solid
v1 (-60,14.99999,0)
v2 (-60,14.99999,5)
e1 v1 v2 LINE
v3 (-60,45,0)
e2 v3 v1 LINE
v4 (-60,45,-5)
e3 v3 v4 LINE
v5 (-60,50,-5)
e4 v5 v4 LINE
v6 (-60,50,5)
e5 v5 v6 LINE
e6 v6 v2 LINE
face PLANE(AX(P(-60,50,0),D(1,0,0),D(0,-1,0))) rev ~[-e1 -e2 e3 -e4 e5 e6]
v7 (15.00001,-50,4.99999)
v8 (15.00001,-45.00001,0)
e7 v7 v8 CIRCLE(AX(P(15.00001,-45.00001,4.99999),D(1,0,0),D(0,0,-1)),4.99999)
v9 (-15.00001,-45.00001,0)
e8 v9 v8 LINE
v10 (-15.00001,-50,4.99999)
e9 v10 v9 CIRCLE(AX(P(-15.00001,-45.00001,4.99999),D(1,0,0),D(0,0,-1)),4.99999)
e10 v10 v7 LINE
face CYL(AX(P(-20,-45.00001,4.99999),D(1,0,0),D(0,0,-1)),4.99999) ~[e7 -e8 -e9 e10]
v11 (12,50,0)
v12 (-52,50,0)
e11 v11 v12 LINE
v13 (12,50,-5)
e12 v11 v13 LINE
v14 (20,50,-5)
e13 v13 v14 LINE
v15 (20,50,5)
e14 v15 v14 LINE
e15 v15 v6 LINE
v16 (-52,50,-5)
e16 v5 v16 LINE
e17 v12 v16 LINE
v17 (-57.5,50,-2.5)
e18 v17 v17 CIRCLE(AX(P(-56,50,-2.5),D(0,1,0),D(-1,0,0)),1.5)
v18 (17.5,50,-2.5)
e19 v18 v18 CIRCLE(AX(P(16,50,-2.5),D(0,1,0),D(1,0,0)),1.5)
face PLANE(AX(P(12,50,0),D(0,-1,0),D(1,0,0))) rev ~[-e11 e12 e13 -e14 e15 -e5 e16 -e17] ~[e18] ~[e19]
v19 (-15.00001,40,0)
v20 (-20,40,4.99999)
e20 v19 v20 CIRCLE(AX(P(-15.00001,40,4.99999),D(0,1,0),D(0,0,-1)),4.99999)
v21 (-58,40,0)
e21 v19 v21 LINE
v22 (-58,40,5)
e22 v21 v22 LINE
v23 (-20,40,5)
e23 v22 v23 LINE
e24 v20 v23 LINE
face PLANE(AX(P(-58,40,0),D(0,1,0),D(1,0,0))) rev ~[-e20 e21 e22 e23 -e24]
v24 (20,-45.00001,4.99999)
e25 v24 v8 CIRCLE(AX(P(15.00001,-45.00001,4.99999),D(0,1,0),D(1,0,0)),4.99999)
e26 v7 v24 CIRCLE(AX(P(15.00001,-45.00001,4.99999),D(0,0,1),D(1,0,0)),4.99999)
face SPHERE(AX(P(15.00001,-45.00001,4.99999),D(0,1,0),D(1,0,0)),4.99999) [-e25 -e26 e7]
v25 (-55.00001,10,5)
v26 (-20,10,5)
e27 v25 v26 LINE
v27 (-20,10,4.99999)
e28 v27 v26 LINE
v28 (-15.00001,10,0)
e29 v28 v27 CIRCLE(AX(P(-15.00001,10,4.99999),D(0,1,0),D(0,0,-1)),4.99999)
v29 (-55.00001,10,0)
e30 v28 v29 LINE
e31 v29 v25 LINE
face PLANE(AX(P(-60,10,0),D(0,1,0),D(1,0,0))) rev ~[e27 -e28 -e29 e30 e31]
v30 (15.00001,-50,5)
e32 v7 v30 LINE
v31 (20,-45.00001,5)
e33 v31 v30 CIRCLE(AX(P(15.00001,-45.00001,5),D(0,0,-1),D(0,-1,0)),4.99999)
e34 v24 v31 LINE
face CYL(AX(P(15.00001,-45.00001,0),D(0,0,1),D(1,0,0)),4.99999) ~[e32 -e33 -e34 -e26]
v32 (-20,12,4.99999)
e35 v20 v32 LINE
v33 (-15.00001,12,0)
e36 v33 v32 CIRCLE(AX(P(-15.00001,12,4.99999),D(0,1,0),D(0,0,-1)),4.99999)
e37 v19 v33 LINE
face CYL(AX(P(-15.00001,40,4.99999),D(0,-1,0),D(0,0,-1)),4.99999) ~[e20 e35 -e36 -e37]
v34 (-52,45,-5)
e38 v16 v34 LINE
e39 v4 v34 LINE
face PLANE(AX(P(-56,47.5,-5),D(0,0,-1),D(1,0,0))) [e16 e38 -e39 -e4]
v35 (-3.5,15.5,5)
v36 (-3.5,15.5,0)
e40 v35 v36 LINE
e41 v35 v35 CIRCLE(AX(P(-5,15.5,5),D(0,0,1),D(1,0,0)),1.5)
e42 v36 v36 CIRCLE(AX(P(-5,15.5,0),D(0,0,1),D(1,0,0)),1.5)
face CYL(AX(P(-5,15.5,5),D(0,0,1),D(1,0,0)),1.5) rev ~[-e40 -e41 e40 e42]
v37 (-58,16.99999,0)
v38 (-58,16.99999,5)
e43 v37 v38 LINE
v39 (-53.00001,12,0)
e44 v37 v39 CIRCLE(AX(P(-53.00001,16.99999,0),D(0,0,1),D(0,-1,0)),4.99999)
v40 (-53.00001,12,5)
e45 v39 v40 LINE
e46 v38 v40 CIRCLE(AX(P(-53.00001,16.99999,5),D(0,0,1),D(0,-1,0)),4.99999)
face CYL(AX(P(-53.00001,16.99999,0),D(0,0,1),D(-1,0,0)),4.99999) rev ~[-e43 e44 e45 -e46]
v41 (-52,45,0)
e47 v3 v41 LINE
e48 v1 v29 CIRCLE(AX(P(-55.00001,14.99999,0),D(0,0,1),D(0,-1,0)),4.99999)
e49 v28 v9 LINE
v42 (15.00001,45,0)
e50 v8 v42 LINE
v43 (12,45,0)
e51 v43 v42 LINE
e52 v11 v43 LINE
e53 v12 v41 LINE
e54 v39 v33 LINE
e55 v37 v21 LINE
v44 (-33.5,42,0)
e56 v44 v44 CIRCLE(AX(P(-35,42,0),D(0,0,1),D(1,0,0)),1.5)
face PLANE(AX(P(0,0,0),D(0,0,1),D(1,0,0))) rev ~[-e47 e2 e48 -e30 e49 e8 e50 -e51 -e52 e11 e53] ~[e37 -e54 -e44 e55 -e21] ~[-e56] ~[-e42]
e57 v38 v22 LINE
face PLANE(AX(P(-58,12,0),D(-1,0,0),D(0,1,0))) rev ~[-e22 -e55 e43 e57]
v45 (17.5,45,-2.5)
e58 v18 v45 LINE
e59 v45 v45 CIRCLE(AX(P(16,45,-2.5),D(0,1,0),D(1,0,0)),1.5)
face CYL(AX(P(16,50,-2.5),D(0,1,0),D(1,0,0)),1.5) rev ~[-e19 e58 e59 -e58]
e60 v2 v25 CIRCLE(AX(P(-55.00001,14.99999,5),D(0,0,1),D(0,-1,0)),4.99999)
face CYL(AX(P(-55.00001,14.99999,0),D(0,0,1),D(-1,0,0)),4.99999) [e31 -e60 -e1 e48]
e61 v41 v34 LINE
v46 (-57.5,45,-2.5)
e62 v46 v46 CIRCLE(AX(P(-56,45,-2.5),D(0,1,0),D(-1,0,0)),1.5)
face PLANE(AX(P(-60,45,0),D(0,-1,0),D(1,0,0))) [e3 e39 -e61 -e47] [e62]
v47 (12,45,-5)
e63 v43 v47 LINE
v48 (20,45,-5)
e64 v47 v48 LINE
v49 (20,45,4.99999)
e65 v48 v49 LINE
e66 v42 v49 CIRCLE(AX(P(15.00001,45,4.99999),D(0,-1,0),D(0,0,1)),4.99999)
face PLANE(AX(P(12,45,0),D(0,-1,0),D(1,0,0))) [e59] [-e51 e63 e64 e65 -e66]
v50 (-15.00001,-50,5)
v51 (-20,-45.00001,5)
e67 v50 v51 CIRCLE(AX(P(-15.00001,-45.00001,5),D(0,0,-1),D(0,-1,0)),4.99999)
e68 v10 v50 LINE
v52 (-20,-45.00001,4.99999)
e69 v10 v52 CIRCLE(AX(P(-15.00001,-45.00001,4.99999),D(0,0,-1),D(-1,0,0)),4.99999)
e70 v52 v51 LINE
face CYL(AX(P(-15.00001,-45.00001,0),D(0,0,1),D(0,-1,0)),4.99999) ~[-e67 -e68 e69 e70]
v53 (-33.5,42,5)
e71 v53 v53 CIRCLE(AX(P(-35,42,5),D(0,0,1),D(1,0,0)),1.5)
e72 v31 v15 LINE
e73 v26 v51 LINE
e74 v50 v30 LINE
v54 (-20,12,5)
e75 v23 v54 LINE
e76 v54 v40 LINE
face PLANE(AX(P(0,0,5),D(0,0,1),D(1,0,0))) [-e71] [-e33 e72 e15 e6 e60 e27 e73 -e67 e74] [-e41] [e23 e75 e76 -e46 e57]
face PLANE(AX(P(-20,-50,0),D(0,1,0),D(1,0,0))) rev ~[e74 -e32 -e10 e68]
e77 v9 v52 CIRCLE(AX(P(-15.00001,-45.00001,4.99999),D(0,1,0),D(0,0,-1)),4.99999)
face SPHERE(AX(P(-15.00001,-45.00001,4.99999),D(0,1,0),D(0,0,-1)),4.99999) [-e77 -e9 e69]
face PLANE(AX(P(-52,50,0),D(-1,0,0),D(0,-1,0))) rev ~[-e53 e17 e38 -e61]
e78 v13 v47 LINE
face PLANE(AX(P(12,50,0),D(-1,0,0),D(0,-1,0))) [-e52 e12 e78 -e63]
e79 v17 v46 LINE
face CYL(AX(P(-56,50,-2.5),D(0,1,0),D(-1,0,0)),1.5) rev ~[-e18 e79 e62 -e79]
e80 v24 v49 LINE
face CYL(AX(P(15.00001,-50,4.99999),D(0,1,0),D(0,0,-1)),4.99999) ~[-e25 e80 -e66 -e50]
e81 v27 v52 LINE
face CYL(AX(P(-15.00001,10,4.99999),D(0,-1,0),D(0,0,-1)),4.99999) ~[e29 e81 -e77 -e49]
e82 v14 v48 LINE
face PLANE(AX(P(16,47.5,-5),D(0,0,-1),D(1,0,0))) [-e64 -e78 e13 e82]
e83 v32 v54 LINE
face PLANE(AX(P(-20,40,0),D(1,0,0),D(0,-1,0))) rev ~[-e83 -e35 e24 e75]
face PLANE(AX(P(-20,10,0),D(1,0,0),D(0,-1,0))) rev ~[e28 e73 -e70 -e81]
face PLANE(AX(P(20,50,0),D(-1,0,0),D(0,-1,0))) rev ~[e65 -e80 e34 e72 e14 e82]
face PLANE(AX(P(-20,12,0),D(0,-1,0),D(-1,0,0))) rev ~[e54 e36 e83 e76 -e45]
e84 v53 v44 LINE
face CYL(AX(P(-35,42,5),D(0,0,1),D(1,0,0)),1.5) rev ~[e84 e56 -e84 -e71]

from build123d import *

# Parameters (mm, degrees)
F0_W     = 38
F0_H     = 10
F1_DEPTH = 5
F2_R     = 1.5
F3_DEPTH = 5
F4_W     = 8
F4_H     = 5
F5_DEPTH = 5
F6_R     = 1.5
F7_DEPTH = 5
F8_R     = 4.99999


# Not quite as in the source:
# - a fillet or chamfer is up to 0.001 mm smaller than in the source, because OpenCascade refuses the exact size
# - a feature names something its author has since deleted; it is built from what else it names


with BuildPart() as f1:
    # F0 (on Top) → F1 (new body)
    with BuildSketch(Plane.XY):
        Polygon((20, -50), (20, 50), (-20, 50), (-20, 40), (-20, 12), (-20, 10), (-20, -50), align=None)
        with Locations((-39, 45)):
            Rectangle(F0_W, F0_H)
        Polygon((-58, 40), (-58, 50), (-60, 50), (-60, 10), (-20, 10), (-20, 12), (-58, 12), align=None)
    extrude(amount=F1_DEPTH)

    # F2 (on face) → F3 (cut)
    with BuildSketch(Plane.XY.offset(5)):
        with Locations((-35, 42)):
            Circle(F2_R)
        with Locations((-5, 15.5)):
            Circle(F2_R)
    extrude(amount=-F3_DEPTH, mode=Mode.SUBTRACT)

    # F4 (on face) → F5 (join)
    with BuildSketch(Plane(origin=(0, 0, 0), x_dir=(1, 0, 0), z_dir=(0, 0, -1))):
        with Locations((16, -47.5)):
            Rectangle(F4_W, F4_H)
        with Locations((-56, -47.5)):
            Rectangle(F4_W, F4_H)
    extrude(amount=F5_DEPTH)

    # F6 (on face) → F7 (cut)
    with BuildSketch(Plane(origin=(0, 50, 0), x_dir=(-1, 0, 0), z_dir=(0, 1, 0))):
        with BuildLine():
            ThreePointArc((-14.5, -2.5), (-16, -1), (-17.5, -2.5))
            ThreePointArc((-17.5, -2.5), (-16, -4), (-14.5, -2.5))
        make_face()
        with Locations((56, -2.5)):
            Circle(F6_R)
    extrude(amount=-F7_DEPTH, mode=Mode.SUBTRACT)

    # F8 (radius 5 in the source; OpenCascade refuses exactly that, so slightly less here)
    f8_edges = [f1.edges().sort_by_distance(p)[0] for p in [
        (20, -2.5, 0),
        (-20, 26, 0),
        (-20, -20, 0),
        (20, -50, 2.5),
        (0, -50, 0),
        (-20, -50, 2.5),
        (-58, 12, 2.5),
        (-60, 10, 2.5),
    ]]
    fillet(f8_edges, radius=F8_R)


solid = f1.part
